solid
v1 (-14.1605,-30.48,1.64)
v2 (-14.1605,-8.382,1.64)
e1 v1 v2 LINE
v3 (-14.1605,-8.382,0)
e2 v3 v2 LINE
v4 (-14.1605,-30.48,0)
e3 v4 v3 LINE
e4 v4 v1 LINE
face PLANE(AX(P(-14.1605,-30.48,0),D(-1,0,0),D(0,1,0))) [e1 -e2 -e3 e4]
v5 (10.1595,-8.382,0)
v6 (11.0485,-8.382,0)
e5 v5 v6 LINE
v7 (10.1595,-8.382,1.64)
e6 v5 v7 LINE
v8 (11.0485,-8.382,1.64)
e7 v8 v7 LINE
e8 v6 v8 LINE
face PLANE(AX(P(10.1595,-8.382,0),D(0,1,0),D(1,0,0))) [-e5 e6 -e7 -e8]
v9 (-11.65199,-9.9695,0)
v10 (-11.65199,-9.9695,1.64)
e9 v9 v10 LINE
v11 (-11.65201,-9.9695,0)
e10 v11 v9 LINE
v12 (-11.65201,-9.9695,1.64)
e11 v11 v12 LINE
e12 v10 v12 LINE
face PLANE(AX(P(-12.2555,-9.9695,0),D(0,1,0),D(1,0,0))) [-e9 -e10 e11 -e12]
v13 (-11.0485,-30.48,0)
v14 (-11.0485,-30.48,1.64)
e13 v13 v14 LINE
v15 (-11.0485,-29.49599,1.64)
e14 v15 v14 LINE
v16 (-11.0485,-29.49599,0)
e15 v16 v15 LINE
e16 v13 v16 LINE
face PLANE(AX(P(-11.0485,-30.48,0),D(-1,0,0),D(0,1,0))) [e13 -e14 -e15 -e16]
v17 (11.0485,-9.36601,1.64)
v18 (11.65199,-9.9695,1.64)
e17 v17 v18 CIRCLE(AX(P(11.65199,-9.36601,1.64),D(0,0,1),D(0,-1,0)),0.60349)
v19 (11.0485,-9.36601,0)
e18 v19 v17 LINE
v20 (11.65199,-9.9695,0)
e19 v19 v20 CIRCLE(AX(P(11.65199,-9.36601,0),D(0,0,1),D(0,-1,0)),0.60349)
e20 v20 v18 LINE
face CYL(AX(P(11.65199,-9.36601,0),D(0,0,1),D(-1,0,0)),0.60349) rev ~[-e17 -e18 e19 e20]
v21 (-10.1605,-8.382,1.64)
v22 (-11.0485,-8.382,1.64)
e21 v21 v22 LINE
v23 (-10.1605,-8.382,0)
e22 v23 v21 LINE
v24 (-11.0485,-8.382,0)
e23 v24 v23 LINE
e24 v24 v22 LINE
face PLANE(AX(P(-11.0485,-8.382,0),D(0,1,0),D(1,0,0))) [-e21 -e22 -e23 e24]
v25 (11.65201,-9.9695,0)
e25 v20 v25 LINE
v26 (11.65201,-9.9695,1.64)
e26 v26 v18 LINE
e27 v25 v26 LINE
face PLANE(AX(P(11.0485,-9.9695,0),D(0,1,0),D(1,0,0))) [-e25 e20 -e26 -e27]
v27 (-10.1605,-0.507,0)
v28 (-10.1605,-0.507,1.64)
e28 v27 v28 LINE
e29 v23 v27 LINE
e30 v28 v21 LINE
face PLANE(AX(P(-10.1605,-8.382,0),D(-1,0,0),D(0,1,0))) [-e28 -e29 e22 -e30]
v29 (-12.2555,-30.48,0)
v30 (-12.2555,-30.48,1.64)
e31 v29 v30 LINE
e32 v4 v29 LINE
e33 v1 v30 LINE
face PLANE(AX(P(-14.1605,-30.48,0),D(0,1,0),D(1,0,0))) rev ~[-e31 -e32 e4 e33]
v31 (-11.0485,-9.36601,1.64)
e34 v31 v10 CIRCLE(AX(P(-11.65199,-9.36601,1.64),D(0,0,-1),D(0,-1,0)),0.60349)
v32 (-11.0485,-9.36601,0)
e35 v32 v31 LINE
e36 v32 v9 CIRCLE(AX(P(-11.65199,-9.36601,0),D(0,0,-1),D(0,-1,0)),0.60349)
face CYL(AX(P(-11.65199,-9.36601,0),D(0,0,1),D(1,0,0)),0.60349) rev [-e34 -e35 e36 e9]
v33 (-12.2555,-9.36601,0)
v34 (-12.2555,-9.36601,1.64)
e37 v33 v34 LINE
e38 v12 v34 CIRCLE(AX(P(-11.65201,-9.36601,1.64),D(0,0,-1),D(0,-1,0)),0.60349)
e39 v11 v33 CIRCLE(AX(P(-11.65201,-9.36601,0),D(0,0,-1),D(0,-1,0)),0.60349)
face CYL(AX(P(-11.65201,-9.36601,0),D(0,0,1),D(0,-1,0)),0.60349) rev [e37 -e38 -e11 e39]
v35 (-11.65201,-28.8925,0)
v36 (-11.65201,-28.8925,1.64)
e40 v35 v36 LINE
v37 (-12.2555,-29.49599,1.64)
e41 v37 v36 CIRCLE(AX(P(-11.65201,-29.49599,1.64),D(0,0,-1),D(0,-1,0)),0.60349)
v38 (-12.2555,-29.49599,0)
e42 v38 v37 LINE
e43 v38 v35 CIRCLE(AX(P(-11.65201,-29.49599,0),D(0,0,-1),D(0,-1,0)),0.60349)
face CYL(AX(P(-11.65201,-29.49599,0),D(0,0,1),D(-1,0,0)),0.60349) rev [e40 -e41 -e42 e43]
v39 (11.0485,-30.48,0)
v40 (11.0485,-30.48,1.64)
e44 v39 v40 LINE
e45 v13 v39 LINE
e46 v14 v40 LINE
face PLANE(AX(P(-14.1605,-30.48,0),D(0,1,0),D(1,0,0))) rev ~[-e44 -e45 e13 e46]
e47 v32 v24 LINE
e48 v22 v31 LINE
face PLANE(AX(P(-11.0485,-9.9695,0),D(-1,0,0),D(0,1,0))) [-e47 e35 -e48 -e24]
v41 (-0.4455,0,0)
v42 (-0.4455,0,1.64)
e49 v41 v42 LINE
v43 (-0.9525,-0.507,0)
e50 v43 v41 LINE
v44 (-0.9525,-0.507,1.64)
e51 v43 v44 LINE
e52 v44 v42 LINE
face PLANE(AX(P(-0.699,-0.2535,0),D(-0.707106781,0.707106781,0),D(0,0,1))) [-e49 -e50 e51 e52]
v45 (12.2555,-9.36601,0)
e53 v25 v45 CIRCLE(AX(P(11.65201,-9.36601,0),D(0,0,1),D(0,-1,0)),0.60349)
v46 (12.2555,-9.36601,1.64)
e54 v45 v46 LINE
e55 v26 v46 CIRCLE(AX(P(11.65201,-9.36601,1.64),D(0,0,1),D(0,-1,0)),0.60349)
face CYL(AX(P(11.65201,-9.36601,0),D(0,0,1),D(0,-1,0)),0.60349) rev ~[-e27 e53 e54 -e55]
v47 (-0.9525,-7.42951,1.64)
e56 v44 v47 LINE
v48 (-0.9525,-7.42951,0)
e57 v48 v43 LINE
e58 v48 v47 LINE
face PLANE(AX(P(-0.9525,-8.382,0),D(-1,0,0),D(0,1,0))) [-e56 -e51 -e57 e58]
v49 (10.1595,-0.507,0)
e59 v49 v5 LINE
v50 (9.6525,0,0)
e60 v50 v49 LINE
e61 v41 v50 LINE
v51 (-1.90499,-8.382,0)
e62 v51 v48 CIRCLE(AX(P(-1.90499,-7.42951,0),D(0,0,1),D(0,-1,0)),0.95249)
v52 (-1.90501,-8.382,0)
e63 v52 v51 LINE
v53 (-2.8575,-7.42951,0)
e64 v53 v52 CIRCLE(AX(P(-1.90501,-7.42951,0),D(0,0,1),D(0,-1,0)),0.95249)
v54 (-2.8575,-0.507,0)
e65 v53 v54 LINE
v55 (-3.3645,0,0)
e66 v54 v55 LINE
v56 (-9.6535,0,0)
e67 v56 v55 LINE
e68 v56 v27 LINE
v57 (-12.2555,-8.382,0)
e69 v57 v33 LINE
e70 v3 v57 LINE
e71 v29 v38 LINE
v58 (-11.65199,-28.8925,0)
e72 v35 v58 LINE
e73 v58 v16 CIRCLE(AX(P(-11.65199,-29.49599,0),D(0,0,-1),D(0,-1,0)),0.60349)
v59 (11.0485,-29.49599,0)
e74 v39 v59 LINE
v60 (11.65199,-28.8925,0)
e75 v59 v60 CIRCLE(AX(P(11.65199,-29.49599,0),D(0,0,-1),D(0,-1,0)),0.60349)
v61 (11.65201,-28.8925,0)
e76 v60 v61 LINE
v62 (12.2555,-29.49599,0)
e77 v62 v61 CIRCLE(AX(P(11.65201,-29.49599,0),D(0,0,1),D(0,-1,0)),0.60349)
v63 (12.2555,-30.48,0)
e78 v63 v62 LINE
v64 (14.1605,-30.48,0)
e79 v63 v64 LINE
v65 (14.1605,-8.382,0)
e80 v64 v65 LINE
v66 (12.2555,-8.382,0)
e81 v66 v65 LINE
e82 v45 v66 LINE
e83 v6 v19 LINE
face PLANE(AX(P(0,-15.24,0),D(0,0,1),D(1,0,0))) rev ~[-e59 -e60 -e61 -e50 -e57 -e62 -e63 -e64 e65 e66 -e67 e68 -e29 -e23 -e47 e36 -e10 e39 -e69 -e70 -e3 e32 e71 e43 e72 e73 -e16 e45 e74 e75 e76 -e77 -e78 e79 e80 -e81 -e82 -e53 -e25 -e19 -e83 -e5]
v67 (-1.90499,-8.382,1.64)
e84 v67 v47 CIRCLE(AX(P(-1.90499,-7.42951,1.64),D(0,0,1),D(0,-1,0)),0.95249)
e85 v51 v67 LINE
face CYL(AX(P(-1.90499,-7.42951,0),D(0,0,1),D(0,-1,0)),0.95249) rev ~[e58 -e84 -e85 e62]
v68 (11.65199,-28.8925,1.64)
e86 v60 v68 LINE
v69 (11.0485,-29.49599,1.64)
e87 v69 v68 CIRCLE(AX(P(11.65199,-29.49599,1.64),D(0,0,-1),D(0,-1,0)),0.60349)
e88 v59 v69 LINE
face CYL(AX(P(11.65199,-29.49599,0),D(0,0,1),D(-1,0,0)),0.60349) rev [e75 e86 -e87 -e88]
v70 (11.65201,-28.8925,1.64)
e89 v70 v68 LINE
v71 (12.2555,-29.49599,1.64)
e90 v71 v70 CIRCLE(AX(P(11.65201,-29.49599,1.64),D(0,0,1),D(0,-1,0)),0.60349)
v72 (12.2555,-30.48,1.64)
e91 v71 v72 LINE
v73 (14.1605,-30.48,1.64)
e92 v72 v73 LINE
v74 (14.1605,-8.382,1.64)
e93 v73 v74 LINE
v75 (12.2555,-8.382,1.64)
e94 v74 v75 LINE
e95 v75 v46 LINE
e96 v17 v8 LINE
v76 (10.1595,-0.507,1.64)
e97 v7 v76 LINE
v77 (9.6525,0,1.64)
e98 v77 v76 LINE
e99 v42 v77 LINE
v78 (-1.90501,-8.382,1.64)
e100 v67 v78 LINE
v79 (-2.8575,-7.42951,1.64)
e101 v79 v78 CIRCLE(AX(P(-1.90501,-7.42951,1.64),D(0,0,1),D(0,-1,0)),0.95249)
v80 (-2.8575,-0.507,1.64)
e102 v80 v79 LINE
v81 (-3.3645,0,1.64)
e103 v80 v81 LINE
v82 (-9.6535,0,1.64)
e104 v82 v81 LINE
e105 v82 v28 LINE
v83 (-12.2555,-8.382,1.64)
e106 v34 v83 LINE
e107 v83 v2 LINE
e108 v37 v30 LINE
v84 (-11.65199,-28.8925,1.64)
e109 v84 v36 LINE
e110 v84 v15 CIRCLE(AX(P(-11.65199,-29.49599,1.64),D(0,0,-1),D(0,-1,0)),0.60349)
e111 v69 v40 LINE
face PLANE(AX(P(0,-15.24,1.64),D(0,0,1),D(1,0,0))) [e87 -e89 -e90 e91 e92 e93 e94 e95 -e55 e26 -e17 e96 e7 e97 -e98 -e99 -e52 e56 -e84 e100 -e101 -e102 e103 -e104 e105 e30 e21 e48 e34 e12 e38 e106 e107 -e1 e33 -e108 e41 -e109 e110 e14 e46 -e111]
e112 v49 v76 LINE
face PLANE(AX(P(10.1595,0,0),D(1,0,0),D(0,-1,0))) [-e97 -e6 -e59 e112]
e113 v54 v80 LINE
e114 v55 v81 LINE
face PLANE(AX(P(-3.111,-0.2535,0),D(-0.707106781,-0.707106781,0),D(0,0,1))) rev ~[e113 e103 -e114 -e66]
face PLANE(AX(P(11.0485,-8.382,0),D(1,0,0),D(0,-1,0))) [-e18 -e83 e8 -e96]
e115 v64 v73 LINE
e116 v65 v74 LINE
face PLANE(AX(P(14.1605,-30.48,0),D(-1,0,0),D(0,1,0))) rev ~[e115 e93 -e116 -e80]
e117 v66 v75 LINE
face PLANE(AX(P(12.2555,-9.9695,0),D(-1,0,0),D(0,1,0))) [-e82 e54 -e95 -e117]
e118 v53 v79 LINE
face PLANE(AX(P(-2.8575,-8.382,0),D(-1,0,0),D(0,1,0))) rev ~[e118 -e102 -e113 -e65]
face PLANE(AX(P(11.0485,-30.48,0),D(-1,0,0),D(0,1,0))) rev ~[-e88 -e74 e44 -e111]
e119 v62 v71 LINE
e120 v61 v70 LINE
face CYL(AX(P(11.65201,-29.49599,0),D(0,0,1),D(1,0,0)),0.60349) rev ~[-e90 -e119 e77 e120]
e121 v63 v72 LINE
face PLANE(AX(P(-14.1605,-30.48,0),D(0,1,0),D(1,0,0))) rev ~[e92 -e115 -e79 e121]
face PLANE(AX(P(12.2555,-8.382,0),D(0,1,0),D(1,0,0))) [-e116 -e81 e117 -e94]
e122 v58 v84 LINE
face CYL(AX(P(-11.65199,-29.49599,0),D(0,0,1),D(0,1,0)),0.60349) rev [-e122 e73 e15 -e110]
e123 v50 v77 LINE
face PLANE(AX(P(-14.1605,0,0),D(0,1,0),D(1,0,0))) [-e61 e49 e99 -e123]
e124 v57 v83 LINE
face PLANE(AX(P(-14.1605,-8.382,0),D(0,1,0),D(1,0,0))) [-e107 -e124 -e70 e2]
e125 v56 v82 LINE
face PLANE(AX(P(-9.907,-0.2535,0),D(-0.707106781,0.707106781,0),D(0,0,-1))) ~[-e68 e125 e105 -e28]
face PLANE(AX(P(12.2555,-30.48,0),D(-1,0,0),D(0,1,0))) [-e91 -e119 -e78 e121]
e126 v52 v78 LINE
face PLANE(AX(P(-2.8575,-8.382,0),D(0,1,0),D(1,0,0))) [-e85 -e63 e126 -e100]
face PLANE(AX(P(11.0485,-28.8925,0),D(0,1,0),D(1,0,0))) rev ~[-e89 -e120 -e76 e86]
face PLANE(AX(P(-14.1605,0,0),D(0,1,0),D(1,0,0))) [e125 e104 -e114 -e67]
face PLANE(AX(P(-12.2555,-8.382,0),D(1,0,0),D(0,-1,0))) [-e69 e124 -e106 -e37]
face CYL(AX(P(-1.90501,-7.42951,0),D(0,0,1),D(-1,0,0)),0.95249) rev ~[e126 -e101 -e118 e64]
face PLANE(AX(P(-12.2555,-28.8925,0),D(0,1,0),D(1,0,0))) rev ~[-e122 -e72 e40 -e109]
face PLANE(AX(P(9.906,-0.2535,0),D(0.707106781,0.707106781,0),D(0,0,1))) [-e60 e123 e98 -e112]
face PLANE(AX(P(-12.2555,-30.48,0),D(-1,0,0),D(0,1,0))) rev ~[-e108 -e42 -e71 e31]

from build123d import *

# Parameters (mm, degrees)
F0_W     = 28.321
F0_H     = 30.48
F1_DEPTH = 1.64
F2_W     = 1.905
F2_H     = 8.382
F2_W_2   = 1.207
F2_H_2   = 1.5875
F3_DEPTH = 25
F4_R     = 0.95249
F5_SIZE  = 0.507
F6_R     = 0.60349


# Not quite as in the source:
# - a fillet or chamfer is up to 0.001 mm smaller than in the source, because OpenCascade refuses the exact size


with BuildPart() as f1:
    # F0 (on Top) → F1 (new body)
    with BuildSketch(Plane.XY):
        with Locations((0, -15.24)):
            Rectangle(F0_W, F0_H)
    extrude(amount=F1_DEPTH)

    # F2 (on Top) → F3 (cut)
    with BuildSketch(Plane.XY):
        Polygon((-10.1605, 0), (-14.1605, 0), (-14.1605, -8.382), (-12.2555, -8.382), (-12.2555, -9.9695), (-11.0485, -9.9695), (-11.0485, -8.382), (-10.1605, -8.382), align=None)
        with Locations((-1.905, -4.191)):
            Rectangle(F2_W, F2_H)
        Polygon((14.1605, -8.382), (14.1605, 0), (10.1595, 0), (10.1595, -8.382), (11.0485, -8.382), (11.0485, -9.9695), (12.2555, -9.9695), (12.2555, -8.382), align=None)
        with Locations((-11.652, -29.68625)):
            Rectangle(F2_W_2, F2_H_2)
        with Locations((11.652, -29.68625)):
            Rectangle(F2_W_2, F2_H_2)
    extrude(amount=F3_DEPTH, mode=Mode.SUBTRACT)

    # F4 (radius 0.9525 in the source; OpenCascade refuses exactly that, so slightly less here)
    f4_edges = [f1.edges().sort_by_distance(p)[0] for p in [
        (-2.8575, -8.382, 0.82),
        (-0.9525, -8.382, 0.82),
    ]]
    fillet(f4_edges, radius=F4_R)

    # F5
    f5_edges = [f1.edges().sort_by_distance(p)[0] for p in [
        (10.1595, 0, 0.82),
        (-0.9525, 0, 0.82),
        (-2.8575, 0, 0.82),
        (-10.1605, 0, 0.82),
    ]]
    chamfer(f5_edges, length=F5_SIZE)

    # F6 (radius 0.6035 in the source; OpenCascade refuses exactly that, so slightly less here)
    f6_edges = [f1.edges().sort_by_distance(p)[0] for p in [
        (12.2555, -28.8925, 0.82),
        (-12.2555, -28.8925, 0.82),
        (-11.0485, -28.8925, 0.82),
        (11.0485, -28.8925, 0.82),
        (11.0485, -9.9695, 0.82),
        (12.2555, -9.9695, 0.82),
        (-12.2555, -9.9695, 0.82),
        (-11.0485, -9.9695, 0.82),
    ]]
    fillet(f6_edges, radius=F6_R)


solid = f1.part
